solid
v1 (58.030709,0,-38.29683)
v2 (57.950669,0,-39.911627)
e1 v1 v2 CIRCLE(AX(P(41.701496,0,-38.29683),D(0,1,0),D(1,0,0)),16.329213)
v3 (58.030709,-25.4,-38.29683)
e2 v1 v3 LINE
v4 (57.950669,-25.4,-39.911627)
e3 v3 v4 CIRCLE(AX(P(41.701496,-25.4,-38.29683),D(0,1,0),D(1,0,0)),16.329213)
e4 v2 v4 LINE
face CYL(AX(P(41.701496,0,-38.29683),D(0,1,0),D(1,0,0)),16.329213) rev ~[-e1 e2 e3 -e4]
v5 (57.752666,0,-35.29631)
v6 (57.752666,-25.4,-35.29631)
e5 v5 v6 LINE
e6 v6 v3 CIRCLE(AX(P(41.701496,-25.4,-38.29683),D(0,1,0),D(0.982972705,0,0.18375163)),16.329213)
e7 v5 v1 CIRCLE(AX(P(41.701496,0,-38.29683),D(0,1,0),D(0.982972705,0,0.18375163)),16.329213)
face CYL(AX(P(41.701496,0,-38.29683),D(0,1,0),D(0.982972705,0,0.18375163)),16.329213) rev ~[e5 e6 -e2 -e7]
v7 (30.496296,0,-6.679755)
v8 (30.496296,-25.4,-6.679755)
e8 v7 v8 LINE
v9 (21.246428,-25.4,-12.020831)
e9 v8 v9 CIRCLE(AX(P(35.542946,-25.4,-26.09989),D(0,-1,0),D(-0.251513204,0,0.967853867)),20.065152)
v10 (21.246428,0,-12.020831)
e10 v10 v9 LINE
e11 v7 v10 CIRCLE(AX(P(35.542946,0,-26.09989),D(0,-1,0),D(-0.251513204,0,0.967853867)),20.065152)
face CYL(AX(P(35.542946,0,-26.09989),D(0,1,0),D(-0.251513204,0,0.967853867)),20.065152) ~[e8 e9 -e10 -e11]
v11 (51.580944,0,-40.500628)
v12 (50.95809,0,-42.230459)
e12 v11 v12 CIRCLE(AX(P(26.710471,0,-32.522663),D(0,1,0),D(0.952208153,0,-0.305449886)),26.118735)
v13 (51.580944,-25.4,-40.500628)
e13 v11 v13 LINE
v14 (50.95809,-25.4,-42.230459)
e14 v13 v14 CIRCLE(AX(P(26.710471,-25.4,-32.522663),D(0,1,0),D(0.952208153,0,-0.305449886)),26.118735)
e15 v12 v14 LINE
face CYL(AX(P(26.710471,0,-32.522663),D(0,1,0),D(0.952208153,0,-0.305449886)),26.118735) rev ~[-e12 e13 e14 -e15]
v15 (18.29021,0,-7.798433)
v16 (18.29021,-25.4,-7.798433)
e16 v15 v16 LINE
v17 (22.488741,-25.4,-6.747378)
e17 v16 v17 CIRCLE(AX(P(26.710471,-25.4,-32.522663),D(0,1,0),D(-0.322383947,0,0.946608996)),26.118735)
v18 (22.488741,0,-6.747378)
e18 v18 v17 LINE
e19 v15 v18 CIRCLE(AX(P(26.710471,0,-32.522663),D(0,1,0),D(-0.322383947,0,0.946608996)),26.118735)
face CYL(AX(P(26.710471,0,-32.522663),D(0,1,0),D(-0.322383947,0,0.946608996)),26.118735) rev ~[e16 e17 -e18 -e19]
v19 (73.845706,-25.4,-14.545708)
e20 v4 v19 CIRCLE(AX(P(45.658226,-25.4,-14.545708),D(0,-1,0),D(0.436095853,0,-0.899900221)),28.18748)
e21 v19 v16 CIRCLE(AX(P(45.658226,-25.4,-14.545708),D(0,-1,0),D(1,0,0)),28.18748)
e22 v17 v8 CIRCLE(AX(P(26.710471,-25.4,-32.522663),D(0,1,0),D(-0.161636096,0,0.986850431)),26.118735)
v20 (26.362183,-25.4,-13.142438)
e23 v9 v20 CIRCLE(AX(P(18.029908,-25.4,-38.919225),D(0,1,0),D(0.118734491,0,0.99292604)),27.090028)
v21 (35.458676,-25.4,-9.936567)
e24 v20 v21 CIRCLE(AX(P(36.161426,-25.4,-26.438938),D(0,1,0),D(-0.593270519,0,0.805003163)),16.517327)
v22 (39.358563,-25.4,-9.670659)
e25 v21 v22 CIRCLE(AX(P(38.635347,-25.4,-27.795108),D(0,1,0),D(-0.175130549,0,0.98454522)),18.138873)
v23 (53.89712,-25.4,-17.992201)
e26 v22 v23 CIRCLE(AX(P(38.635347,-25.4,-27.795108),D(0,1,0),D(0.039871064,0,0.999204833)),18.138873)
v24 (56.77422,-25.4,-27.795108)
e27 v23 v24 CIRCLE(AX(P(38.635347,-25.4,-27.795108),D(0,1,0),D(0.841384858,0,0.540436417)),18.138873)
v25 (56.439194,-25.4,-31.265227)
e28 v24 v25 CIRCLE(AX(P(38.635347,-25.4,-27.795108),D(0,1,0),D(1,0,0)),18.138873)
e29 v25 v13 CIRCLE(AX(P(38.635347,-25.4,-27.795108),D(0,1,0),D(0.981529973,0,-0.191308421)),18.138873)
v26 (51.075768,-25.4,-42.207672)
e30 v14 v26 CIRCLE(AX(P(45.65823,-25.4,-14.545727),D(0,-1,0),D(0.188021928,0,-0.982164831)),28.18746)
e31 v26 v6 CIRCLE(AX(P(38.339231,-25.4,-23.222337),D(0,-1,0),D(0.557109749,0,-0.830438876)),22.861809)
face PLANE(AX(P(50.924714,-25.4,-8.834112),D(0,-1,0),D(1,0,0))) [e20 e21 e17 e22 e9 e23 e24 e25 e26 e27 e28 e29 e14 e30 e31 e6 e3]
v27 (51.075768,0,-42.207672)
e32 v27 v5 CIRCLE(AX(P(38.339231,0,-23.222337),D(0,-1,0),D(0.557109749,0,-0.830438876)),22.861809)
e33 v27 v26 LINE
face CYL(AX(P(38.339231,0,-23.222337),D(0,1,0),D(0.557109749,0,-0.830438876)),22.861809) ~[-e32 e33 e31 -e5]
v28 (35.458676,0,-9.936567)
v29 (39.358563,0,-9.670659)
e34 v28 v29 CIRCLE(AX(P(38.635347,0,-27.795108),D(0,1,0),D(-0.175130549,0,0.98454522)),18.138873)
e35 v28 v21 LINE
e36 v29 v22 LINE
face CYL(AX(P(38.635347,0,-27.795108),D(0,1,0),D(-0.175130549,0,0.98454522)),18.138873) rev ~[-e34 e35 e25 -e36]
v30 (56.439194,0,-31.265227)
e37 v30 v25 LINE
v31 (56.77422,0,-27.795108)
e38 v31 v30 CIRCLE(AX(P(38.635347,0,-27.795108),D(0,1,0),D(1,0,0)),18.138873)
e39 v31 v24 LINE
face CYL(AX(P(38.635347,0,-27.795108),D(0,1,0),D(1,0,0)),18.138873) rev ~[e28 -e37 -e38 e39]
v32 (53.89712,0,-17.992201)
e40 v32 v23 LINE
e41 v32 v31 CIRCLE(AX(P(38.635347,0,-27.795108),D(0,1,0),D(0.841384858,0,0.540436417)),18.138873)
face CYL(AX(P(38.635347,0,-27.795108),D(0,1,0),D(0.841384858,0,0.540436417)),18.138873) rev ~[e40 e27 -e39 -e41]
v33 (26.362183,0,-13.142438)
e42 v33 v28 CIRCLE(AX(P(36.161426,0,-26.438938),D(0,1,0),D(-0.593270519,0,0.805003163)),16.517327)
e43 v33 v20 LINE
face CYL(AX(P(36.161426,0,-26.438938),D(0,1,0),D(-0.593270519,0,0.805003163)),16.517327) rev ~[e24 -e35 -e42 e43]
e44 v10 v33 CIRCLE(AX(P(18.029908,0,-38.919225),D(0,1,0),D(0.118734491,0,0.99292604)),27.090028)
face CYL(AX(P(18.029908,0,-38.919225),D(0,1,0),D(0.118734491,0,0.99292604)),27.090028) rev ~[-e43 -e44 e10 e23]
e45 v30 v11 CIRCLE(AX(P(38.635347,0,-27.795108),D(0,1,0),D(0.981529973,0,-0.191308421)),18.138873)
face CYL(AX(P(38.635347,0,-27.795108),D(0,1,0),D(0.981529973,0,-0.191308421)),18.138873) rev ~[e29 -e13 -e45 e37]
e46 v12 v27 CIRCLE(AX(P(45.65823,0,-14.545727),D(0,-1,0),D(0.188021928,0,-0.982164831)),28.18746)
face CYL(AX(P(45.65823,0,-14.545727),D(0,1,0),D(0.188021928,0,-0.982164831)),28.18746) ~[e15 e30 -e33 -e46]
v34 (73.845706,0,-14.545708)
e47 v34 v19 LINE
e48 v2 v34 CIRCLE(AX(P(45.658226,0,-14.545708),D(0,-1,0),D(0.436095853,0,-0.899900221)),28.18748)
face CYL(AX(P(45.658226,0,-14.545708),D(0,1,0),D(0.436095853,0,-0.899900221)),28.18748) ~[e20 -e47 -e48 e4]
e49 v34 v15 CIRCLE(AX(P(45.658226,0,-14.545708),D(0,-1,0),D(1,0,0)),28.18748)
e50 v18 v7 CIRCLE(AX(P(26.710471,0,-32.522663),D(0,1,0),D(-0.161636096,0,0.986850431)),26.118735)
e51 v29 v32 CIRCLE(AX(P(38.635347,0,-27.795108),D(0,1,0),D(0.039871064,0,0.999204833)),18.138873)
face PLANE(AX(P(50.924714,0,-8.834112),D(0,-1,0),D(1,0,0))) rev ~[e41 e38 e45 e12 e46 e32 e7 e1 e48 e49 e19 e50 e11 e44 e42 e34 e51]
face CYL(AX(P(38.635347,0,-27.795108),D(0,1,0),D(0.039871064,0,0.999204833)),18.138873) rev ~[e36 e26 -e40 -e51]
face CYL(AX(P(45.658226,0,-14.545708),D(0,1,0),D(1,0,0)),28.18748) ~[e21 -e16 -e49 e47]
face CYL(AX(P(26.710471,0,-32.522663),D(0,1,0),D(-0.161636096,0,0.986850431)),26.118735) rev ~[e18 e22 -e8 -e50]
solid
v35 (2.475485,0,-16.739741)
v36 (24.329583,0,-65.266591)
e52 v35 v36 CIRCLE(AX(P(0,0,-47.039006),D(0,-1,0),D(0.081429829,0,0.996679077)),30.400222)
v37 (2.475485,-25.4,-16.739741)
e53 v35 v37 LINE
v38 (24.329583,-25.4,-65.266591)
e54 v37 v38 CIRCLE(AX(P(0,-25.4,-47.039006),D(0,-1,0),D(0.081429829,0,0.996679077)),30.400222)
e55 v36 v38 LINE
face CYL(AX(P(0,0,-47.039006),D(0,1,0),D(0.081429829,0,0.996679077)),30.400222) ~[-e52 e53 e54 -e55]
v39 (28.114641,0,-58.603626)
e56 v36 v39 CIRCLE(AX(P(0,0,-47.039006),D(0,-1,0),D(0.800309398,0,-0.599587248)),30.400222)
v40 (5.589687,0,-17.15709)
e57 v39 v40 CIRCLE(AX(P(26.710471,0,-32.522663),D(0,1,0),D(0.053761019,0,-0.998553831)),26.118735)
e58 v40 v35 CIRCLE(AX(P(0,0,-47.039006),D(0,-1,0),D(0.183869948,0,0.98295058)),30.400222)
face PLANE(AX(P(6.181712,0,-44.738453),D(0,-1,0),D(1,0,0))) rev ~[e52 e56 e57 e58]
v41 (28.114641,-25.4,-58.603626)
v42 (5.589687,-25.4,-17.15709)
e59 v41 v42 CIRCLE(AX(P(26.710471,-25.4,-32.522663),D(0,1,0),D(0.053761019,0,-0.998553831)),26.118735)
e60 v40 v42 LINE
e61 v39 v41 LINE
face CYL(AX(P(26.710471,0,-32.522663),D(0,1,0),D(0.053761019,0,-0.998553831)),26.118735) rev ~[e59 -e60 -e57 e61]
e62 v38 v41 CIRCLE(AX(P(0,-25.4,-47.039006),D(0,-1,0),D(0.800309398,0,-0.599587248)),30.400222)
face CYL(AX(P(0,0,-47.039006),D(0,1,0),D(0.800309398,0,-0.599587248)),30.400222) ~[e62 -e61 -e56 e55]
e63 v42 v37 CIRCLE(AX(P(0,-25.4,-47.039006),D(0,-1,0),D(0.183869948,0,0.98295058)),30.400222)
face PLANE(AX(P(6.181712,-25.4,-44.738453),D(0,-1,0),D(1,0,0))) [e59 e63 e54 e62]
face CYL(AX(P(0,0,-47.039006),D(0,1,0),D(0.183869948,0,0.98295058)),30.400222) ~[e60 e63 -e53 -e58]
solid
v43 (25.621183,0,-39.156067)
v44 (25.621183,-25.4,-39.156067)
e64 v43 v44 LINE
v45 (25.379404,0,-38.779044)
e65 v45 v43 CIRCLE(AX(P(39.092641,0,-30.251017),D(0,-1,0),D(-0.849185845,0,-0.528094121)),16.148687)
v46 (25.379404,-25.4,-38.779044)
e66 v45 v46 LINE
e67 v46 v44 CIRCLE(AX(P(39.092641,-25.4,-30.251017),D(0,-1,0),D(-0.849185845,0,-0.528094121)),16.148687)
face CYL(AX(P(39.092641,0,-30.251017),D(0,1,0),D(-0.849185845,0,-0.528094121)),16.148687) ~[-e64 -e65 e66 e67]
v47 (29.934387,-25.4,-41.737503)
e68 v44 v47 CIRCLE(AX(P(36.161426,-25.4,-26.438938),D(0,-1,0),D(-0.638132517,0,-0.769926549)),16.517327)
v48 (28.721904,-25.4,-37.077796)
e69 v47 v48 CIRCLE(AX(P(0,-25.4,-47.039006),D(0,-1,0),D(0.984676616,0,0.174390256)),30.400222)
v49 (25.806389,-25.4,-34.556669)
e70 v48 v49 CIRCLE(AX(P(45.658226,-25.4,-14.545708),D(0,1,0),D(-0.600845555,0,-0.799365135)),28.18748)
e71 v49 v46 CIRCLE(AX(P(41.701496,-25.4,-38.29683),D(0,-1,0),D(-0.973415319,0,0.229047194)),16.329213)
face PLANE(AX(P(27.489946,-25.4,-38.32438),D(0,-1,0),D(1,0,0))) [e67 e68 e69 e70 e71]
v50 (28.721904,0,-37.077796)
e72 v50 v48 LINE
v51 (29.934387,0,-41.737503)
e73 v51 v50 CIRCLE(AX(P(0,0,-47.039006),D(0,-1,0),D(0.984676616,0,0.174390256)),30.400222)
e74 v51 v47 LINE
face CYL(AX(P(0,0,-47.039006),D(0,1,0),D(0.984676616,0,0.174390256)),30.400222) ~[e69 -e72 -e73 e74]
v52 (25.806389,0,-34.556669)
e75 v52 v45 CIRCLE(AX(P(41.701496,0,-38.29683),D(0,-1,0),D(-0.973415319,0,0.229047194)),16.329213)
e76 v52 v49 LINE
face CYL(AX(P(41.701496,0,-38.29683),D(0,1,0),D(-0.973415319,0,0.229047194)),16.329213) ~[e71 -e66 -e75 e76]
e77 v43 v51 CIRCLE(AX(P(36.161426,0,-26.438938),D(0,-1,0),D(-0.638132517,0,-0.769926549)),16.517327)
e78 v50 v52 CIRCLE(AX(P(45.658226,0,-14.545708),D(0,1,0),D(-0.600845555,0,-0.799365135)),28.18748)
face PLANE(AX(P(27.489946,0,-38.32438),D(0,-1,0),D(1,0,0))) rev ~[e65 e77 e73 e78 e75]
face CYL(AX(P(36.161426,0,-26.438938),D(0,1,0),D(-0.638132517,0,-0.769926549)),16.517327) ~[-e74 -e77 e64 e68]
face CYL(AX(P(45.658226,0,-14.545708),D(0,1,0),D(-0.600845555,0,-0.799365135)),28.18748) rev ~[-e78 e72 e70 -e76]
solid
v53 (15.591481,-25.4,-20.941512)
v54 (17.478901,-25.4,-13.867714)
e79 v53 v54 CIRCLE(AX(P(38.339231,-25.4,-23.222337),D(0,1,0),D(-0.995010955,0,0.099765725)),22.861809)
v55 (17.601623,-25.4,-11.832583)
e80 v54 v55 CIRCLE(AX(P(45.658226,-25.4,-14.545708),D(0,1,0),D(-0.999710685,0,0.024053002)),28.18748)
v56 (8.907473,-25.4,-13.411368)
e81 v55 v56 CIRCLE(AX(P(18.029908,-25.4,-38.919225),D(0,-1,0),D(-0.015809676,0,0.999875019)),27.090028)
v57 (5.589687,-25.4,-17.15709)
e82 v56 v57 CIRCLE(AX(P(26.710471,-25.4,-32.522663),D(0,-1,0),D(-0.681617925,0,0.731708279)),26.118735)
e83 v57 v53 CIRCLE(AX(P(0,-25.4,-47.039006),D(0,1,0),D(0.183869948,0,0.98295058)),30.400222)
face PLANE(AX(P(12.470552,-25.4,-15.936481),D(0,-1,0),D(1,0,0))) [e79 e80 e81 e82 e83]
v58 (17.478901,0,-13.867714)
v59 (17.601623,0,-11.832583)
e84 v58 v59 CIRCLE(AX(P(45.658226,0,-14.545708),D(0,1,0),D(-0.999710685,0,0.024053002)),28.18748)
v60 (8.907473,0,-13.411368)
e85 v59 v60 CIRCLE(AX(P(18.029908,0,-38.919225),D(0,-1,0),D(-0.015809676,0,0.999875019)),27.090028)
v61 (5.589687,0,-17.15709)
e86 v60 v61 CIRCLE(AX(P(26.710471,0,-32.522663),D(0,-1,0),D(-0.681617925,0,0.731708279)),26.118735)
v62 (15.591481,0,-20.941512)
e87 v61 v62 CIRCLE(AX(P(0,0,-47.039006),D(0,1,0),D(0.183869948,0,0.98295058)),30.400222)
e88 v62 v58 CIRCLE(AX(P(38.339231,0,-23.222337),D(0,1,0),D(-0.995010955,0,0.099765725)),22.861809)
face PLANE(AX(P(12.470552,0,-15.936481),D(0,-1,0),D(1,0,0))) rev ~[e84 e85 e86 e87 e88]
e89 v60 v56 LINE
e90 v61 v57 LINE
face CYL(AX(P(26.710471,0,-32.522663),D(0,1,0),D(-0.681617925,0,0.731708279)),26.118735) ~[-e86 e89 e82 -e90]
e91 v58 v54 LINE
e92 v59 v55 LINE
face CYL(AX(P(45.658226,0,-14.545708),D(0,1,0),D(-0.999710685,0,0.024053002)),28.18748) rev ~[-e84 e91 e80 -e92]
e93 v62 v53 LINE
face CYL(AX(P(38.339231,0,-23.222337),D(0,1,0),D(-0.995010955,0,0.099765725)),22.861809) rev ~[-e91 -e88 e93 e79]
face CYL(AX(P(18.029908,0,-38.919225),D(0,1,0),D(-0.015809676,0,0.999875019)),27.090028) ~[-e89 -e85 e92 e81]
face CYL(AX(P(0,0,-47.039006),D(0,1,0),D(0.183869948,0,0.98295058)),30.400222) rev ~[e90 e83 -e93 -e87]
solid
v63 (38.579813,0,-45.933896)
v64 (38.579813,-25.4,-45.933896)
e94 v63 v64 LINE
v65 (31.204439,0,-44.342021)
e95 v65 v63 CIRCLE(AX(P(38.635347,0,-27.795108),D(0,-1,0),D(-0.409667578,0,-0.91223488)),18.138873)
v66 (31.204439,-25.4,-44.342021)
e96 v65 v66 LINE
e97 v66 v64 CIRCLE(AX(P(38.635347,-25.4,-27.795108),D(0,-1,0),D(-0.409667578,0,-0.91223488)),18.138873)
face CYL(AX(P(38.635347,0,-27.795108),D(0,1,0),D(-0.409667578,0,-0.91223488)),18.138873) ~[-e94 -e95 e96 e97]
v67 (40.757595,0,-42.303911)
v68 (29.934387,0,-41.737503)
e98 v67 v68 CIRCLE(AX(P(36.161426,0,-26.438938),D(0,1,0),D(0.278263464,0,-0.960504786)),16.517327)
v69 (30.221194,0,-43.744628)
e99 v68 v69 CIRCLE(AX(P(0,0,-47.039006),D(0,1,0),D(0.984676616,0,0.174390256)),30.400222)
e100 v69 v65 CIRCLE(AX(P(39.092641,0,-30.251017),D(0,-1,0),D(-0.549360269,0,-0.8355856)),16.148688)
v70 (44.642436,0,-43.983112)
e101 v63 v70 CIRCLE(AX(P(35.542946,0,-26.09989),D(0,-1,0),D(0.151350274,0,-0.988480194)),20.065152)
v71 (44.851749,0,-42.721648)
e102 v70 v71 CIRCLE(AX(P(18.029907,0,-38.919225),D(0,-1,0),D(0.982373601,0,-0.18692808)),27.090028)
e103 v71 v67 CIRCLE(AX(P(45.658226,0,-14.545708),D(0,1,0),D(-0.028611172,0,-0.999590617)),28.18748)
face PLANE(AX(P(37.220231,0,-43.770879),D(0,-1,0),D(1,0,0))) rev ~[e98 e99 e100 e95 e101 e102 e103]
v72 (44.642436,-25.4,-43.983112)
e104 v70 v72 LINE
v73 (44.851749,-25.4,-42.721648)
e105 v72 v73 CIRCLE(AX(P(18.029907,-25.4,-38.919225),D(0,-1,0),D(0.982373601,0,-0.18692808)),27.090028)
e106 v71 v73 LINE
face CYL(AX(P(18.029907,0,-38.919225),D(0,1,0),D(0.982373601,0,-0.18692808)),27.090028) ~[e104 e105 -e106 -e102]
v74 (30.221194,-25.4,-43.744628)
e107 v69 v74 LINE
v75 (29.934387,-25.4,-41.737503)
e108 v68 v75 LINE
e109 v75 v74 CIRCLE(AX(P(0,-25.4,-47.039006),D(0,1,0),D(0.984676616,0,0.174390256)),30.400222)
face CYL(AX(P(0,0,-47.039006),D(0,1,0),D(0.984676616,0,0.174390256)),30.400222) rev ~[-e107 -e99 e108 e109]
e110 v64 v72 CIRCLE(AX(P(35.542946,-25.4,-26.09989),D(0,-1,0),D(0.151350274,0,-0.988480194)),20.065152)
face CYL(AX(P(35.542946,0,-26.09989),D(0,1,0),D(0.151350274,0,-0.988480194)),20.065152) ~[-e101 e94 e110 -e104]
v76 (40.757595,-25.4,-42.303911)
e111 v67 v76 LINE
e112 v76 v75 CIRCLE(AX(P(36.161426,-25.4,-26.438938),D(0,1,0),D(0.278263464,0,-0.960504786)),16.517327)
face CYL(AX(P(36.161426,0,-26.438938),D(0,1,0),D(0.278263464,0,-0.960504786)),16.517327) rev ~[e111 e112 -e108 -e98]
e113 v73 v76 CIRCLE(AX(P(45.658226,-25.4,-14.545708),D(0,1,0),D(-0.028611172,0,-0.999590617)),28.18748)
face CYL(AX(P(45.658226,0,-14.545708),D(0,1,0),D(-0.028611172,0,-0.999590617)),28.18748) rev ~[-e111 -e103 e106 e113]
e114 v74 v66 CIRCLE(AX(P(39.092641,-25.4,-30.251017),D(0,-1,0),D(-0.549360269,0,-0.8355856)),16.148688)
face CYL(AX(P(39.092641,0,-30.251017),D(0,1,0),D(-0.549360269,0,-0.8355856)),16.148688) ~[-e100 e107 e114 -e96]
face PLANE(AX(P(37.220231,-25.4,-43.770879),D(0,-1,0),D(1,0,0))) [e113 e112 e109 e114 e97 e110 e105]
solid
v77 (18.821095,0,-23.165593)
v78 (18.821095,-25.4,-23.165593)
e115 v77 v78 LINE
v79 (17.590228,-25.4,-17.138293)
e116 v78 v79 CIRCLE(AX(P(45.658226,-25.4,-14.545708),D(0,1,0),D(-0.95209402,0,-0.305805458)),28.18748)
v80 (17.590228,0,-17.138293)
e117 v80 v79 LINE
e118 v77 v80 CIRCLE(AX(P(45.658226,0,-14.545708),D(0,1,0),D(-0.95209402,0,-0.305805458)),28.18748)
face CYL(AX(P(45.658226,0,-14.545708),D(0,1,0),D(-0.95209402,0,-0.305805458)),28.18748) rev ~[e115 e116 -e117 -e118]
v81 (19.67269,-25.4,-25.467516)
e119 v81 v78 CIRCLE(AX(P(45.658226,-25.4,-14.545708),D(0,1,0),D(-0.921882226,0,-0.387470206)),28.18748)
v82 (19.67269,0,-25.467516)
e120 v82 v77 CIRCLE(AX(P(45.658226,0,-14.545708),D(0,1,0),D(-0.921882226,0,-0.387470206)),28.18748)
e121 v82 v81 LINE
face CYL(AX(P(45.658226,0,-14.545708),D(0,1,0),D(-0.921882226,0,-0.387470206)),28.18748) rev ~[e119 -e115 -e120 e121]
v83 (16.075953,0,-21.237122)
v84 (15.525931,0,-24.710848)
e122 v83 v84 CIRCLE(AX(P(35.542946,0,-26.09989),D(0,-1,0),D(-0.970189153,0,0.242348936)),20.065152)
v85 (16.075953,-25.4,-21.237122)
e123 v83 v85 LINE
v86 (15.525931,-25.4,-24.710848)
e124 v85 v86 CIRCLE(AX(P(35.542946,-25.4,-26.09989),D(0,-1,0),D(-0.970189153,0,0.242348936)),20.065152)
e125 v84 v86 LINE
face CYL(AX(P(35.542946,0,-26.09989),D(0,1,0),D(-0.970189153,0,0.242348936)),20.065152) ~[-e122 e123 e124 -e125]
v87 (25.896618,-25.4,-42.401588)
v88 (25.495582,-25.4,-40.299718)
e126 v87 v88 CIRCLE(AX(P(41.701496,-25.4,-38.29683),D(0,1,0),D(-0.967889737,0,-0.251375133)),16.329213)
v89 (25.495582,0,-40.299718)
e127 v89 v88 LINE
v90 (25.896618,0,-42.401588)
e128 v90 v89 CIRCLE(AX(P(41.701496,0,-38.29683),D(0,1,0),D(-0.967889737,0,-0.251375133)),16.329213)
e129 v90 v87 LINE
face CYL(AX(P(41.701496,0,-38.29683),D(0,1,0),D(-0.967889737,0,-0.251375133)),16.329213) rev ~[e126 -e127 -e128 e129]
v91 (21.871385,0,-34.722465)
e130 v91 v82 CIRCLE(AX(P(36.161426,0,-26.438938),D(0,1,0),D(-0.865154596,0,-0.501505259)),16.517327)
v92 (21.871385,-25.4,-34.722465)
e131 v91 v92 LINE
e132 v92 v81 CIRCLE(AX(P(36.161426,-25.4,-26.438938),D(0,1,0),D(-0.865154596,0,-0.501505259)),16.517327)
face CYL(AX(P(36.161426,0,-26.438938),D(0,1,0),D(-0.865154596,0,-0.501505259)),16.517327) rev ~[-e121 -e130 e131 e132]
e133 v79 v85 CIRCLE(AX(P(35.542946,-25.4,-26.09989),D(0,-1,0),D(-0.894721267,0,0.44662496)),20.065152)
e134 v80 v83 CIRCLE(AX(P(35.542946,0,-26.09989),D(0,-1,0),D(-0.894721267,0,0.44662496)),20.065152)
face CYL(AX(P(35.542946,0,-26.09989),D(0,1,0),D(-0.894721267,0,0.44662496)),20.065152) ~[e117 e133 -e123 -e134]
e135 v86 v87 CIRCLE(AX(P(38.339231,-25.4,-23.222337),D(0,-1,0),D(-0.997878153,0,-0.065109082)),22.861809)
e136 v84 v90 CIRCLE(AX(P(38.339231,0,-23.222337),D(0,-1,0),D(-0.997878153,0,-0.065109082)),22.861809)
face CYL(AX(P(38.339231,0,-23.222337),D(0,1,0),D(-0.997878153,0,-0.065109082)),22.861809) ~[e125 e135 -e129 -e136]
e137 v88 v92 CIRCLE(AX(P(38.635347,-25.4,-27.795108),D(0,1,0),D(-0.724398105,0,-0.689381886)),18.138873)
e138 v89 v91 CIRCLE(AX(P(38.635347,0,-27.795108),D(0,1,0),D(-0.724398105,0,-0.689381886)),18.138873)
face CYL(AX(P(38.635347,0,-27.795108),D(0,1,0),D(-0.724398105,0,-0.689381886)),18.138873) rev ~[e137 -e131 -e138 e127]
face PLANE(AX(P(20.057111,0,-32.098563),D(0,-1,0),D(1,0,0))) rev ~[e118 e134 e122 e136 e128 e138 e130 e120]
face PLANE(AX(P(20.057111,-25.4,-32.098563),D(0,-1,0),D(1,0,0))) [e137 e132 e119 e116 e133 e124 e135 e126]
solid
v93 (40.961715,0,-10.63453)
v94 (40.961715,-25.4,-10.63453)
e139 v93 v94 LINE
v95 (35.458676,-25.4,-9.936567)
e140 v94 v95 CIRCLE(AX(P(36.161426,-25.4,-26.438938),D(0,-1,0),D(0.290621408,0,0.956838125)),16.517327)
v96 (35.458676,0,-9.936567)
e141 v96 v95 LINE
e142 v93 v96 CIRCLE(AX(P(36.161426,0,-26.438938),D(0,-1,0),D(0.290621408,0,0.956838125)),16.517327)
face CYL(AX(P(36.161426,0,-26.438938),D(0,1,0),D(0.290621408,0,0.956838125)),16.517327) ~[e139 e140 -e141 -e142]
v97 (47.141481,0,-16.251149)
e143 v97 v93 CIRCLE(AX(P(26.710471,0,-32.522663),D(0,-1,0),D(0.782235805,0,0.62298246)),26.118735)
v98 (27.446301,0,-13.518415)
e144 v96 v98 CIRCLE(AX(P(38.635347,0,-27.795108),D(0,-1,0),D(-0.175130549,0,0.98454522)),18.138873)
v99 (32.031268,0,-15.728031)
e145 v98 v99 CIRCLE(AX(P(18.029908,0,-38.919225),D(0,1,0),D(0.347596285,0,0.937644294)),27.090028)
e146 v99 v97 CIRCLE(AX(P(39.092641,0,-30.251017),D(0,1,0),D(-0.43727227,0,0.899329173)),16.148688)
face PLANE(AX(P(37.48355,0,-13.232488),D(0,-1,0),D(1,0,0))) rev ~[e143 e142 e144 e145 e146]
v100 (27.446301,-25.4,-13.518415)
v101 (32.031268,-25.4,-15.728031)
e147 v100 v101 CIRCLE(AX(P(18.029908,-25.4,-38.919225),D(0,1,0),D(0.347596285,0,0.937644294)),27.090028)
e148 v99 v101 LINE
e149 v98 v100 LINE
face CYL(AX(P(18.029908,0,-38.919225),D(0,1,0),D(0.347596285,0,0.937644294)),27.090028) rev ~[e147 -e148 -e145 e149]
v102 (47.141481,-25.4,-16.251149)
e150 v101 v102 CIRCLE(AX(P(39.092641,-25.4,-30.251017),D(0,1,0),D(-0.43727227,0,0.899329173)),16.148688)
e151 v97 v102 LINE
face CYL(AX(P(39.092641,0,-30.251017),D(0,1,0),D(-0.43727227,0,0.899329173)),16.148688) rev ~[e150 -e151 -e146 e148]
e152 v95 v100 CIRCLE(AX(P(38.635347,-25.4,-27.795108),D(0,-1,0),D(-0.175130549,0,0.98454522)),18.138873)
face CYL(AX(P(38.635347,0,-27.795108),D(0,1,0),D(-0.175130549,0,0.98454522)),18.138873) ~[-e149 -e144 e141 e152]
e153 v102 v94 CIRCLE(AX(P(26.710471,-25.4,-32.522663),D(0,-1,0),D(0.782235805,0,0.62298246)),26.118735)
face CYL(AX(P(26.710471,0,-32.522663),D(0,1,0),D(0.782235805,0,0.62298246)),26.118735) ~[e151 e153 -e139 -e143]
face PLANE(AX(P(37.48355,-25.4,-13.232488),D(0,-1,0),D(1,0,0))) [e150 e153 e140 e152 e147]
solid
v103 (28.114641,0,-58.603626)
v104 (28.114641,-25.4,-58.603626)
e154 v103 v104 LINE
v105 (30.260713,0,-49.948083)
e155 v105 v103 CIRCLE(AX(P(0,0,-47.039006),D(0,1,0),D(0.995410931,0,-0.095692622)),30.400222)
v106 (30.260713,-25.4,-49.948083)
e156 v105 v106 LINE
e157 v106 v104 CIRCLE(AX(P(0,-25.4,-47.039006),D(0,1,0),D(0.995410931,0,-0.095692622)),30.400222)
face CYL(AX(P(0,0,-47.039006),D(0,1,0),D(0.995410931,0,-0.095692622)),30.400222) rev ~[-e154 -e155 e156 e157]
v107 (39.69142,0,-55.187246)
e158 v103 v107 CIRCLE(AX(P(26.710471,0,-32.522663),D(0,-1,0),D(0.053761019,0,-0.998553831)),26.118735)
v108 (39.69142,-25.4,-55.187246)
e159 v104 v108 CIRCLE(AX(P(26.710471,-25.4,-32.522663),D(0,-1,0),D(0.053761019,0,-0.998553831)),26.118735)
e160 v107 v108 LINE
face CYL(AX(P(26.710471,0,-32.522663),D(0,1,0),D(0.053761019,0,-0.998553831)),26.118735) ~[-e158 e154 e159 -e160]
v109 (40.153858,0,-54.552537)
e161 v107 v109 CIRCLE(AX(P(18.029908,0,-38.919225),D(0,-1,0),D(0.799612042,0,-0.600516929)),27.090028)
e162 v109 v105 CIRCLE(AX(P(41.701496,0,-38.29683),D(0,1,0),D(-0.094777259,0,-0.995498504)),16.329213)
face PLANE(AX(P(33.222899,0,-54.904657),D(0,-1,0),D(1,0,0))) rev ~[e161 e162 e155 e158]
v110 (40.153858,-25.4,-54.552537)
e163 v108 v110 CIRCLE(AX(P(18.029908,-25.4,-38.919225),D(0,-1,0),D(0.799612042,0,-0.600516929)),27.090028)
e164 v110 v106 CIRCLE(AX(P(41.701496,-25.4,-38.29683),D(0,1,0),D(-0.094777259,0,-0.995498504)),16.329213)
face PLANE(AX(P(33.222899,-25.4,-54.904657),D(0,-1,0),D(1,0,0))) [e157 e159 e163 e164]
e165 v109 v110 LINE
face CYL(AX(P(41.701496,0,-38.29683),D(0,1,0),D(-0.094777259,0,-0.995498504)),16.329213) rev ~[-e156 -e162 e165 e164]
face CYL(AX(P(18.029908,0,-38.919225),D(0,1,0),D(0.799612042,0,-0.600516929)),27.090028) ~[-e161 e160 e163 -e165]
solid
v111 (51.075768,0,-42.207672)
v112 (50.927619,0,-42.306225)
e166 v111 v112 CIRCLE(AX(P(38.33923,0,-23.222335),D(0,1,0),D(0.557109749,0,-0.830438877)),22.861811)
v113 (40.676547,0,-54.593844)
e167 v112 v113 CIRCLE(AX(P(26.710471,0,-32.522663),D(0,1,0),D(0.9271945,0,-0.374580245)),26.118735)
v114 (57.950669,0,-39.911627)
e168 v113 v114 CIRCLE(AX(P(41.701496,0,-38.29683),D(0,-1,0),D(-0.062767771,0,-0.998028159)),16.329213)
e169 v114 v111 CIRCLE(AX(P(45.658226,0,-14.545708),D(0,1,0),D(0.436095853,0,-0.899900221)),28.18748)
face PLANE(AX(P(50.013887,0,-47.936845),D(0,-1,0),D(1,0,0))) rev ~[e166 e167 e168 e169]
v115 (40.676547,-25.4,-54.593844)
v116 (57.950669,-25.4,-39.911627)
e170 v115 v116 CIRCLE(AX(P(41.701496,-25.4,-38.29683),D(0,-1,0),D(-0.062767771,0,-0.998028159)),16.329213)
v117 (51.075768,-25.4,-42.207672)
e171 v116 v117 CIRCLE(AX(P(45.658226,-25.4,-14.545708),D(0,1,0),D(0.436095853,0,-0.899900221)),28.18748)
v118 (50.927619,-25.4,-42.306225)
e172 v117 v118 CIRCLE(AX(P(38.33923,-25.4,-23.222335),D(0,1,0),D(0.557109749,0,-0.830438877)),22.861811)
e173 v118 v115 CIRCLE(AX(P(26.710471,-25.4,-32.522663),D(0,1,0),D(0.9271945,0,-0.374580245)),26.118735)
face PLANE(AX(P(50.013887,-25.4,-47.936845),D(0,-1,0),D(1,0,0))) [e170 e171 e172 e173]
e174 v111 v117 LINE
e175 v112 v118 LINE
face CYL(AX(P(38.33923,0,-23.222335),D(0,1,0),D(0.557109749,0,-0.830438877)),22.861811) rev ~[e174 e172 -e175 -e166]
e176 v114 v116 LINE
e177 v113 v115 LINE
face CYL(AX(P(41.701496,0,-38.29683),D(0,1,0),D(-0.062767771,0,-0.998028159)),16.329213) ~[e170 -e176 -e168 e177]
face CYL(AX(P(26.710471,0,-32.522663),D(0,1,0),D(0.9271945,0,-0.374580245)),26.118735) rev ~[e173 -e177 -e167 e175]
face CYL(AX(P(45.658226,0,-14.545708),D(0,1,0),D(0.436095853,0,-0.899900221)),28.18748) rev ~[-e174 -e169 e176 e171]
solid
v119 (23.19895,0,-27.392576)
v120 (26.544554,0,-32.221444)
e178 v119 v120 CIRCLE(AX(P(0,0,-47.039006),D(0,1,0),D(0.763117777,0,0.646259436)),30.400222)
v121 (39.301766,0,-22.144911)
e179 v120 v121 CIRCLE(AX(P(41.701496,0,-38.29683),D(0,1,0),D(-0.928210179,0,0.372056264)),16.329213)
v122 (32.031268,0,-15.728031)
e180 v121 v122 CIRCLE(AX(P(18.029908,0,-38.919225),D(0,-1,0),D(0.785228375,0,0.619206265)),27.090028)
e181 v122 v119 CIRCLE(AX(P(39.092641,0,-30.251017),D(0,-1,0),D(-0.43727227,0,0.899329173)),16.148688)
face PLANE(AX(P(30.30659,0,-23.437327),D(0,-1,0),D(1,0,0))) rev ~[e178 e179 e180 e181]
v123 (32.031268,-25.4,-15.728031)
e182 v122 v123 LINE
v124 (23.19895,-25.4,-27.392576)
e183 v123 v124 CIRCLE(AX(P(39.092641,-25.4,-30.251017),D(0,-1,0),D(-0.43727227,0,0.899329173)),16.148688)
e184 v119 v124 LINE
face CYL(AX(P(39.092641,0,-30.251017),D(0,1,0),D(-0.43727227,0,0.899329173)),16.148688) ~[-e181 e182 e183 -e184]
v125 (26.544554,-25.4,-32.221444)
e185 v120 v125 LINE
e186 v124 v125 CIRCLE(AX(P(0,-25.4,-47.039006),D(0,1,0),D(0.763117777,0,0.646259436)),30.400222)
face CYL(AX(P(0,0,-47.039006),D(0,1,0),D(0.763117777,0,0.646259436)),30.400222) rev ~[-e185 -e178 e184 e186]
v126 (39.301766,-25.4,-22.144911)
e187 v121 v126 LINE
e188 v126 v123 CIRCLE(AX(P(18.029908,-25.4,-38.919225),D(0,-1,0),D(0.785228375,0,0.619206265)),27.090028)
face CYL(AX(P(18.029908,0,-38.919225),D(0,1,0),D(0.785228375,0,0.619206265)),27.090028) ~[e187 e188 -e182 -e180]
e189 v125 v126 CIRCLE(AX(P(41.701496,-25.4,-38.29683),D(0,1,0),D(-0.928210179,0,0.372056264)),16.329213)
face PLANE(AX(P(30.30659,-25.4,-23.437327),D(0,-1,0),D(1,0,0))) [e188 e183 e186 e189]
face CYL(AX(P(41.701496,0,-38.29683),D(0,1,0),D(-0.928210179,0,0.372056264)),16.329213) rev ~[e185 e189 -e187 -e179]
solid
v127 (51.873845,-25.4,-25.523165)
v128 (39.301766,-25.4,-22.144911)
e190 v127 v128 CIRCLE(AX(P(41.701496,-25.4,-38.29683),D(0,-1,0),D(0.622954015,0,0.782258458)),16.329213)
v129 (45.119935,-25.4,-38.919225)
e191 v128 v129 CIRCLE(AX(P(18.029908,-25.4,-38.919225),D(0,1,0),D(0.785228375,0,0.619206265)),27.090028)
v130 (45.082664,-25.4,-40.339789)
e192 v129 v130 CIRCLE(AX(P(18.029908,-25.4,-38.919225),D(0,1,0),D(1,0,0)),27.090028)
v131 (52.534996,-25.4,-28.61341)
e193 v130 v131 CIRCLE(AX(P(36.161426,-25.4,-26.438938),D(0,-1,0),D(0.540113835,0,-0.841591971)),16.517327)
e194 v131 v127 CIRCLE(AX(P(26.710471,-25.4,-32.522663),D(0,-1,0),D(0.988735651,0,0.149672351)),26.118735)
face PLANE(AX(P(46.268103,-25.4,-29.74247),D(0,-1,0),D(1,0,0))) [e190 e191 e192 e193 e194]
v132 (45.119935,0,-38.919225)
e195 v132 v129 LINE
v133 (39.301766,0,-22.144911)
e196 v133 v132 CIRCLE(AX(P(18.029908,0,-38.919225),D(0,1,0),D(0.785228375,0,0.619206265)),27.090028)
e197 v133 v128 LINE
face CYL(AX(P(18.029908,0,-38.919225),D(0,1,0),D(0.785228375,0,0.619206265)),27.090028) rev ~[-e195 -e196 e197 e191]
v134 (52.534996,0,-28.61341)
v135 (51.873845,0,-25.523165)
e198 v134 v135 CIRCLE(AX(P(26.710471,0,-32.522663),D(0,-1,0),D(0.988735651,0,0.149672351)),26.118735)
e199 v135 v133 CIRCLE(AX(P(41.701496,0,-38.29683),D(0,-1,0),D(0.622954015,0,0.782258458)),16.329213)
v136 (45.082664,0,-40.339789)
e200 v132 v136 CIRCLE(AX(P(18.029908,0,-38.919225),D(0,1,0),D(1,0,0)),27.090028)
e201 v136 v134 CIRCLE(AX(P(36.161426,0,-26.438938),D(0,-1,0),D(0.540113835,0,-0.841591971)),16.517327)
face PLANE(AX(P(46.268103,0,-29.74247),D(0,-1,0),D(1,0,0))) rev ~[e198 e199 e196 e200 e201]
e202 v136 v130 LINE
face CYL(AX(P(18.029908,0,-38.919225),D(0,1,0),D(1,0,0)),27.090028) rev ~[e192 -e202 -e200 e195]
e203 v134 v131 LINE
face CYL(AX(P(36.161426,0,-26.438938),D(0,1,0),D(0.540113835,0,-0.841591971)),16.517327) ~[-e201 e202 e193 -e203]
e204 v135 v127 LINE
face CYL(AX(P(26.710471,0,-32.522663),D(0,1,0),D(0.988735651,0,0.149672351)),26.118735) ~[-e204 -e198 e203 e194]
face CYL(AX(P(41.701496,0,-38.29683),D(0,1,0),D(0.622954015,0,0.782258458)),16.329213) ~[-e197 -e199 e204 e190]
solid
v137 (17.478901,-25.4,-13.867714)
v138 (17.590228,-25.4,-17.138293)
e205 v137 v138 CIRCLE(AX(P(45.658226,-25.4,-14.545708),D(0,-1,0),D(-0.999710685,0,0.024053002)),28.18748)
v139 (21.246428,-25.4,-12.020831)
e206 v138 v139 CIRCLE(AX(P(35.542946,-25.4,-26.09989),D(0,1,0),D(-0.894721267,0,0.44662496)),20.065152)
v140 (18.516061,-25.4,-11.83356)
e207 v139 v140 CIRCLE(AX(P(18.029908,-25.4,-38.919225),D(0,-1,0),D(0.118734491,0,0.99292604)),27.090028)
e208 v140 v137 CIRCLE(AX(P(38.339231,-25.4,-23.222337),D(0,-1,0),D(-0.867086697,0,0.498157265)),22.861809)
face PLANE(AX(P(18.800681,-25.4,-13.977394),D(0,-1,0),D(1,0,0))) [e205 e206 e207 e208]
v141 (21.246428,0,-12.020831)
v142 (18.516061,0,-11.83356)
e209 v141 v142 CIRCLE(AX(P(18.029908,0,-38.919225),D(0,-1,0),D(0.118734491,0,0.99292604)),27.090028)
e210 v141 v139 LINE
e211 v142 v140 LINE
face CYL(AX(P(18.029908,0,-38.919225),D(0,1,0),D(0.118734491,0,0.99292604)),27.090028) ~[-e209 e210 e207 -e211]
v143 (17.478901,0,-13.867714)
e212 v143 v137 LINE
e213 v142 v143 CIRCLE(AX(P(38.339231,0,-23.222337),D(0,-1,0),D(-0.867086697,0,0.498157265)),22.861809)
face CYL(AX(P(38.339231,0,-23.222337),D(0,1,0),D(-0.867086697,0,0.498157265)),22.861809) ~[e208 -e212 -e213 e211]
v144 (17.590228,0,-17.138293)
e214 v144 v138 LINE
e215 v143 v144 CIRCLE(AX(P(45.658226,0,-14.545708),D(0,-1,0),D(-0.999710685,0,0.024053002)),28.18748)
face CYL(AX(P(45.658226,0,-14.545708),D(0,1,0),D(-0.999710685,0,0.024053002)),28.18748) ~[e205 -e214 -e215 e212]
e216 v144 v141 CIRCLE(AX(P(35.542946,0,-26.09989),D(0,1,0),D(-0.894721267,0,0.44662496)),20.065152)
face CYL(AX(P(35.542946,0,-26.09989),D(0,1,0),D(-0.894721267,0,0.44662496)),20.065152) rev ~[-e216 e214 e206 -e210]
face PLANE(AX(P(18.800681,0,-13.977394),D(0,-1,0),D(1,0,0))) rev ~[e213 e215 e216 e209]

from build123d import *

# Parameters (mm, degrees)
F1_DEPTH = 25.4


with BuildPart() as f1:
    # F0 (on Front) → F1 (new body)
    with BuildSketch(Plane.XZ):
        with BuildLine():
            ThreePointArc((40.1538575824, -54.5525371766), (34.8112838881, -53.101159825), (30.2607130008, -49.9480828366))
            ThreePointArc((30.2607130008, -49.9480828366), (29.5067805021, -54.3549736685), (28.1146409687, -58.6036262239))
            ThreePointArc((28.1146409687, -58.6036262239), (34.1030907269, -57.5733618162), (39.691420026, -55.1872455363))
            ThreePointArc((39.691420026, -55.1872455363), (39.9249388458, -54.8715671271), (40.1538575824, -54.5525371766))
        make_face()
    extrude(amount=F1_DEPTH)


with BuildPart() as f1b:
    # F0 (on Front) → F1, piece 2 (new body)
    with BuildSketch(Plane.XZ):
        with BuildLine():
            ThreePointArc((24.3295831314, -65.2665911695), (26.4328949575, -62.0548490079), (28.1146409687, -58.6036262239))
            ThreePointArc((28.1146409687, -58.6036262239), (3.7618317001, -44.9945627843), (5.5896871945, -17.1570903547))
            ThreePointArc((5.5896871945, -17.1570903547), (4.0379815695, -16.9081548594), (2.4754848513, -16.7397409859))
            ThreePointArc((2.4754848513, -16.7397409859), (-6.670828805, -50.0432179604), (24.3295831314, -65.2665911695))
        make_face()
        with BuildLine():
            ThreePointArc((2.4754848513, -16.7397409859), (-27.7189775168, -59.5222653089), (24.3295831314, -65.2665911695))
            ThreePointArc((24.3295831314, -65.2665911695), (-6.670828805, -50.0432179604), (2.4754848513, -16.7397409859))
        make_face()
    extrude(amount=F1_DEPTH)


with BuildPart() as f1c:
    # F0 (on Front) → F1, piece 3 (new body)
    with BuildSketch(Plane.XZ):
        with BuildLine():
            ThreePointArc((15.5259313509, -24.7108479388), (18.6165177504, -34.7842088044), (25.8966178224, -42.4015880363))
            ThreePointArc((25.8966178224, -42.4015880363), (25.6616341127, -41.3572292778), (25.4955819125, -40.2997184139))
            ThreePointArc((25.4955819125, -40.2997184139), (23.4256571039, -37.6786317178), (21.8713846988, -34.7224650322))
            ThreePointArc((21.8713846988, -34.7224650322), (20.0913666116, -30.2566972991), (19.6726895469, -25.4675162258))
            ThreePointArc((19.6726895469, -25.4675162258), (19.221825797, -24.3258278708), (18.8210952423, -23.1655927897))
            ThreePointArc((18.8210952423, -23.1655927897), (17.4751466685, -22.1634611108), (16.075953424, -21.2371222257))
            ThreePointArc((16.075953424, -21.2371222257), (15.7246867633, -22.9619109348), (15.5259313509, -24.7108479388))
        make_face()
        with BuildLine():
            ThreePointArc((17.5902280452, -17.1382927375), (16.7211824063, -19.1463639854), (16.075953424, -21.2371222257))
            ThreePointArc((16.075953424, -21.2371222257), (17.4751466685, -22.1634611108), (18.8210952423, -23.1655927897))
            ThreePointArc((18.8210952423, -23.1655927897), (18.0407428379, -20.1856217155), (17.5902280452, -17.1382927375))
        make_face()
    extrude(amount=F1_DEPTH)


with BuildPart() as f1d:
    # F0 (on Front) → F1, piece 4 (new body)
    with BuildSketch(Plane.XZ):
        with BuildLine():
            ThreePointArc((8.9074729487, -13.4113681026), (7.1586729424, -15.2045936945), (5.5896871945, -17.1570903547))
            ThreePointArc((5.5896871945, -17.1570903547), (10.7582958294, -18.606057575), (15.5914806817, -20.94151158))
            ThreePointArc((15.5914806817, -20.94151158), (16.2501882549, -17.3285688299), (17.4789014653, -13.8677141914))
            ThreePointArc((17.4789014653, -13.8677141914), (17.5218559184, -12.8490388813), (17.6016231545, -11.8325834418))
            ThreePointArc((17.6016231545, -11.8325834418), (13.1897424114, -12.265100016), (8.9074729487, -13.4113681026))
        make_face()
    extrude(amount=F1_DEPTH)


with BuildPart() as f1e:
    # F0 (on Front) → F1, piece 5 (new body)
    with BuildSketch(Plane.XZ):
        with BuildLine():
            ThreePointArc((50.9276188863, -42.3062252748), (46.7662943353, -49.2544379076), (40.6765473403, -54.5938444613))
            ThreePointArc((40.6765473403, -54.5938444613), (52.276756188, -50.7389787125), (57.9506689588, -39.9116268146))
            ThreePointArc((57.9506689588, -39.9116268146), (54.5873270883, -41.2815480667), (51.0757678908, -42.2076715883))
            ThreePointArc((51.0757678908, -42.2076715883), (51.0017892703, -42.257092564), (50.9276188863, -42.3062252748))
        make_face()
    extrude(amount=F1_DEPTH)


with BuildPart() as f1f:
    # F0 (on Front) → F1, piece 6 (new body)
    with BuildSketch(Plane.XZ):
        with BuildLine():
            ThreePointArc((29.9343874447, -41.7375034561), (30.0945281638, -42.7386739982), (30.2211937836, -43.744627936))
            ThreePointArc((30.2211937836, -43.744627936), (30.7074945796, -44.0520833186), (31.204438934, -44.3420205277))
            ThreePointArc((31.204438934, -44.3420205277), (34.8084393601, -45.5256885647), (38.5798125698, -45.9338958727))
            ThreePointArc((38.5798125698, -45.9338958727), (41.6890159042, -45.2005751575), (44.6424357179, -43.9831122014))
            ThreePointArc((44.6424357179, -43.9831122014), (44.7545364965, -43.3536151903), (44.8517491914, -42.721647815))
            ThreePointArc((44.8517491914, -42.721647815), (42.7970382383, -42.5875979854), (40.7575952062, -42.3039105235))
            ThreePointArc((40.7575952062, -42.3039105235), (35.2982122915, -42.9336942044), (29.9343874447, -41.7375034561))
        make_face()
    extrude(amount=F1_DEPTH)


with BuildPart() as f1g:
    # F0 (on Front) → F1, piece 7 (new body)
    with BuildSketch(Plane.XZ):
        with BuildLine():
            ThreePointArc((58.0307088051, -38.2968299091), (58.0106865683, -39.1052195774), (57.9506689588, -39.9116268146))
            ThreePointArc((57.9506689588, -39.9116268146), (69.5436503466, -29.5130224408), (73.8457056162, -14.5457076903))
            ThreePointArc((73.8457056162, -14.5457076903), (49.056653384, 13.4361560453), (18.2902101299, -7.7984331473))
            ThreePointArc((18.2902101299, -7.7984331473), (20.3676668553, -7.1857892567), (22.4887407194, -6.747377754))
            ThreePointArc((22.4887407194, -6.747377754), (47.2916450309, -2.1862580033), (61.2010402451, -23.2223365456))
            ThreePointArc((61.2010402451, -23.2223365456), (60.3220490691, -29.5007146335), (57.7526664727, -35.2963103729))
            ThreePointArc((57.7526664727, -35.2963103729), (57.9610496417, -36.7901427298), (58.0307088051, -38.2968299091))
        make_face()
        with BuildLine():
            ThreePointArc((51.5809438877, -40.5006277219), (51.2847425976, -41.3710254533), (50.9580903246, -42.2304588174))
            ThreePointArc((50.9580903246, -42.2304588174), (51.0169412202, -42.219127754), (51.0757678908, -42.2076715883))
            ThreePointArc((51.0757678908, -42.2076715883), (54.7814604512, -39.1067758035), (57.7526664727, -35.2963103729))
            ThreePointArc((57.7526664727, -35.2963103729), (57.2273138462, -33.2379593231), (56.4391944195, -31.2652271578))
            ThreePointArc((56.4391944195, -31.2652271578), (54.6885472182, -36.2398384797), (51.5809438877, -40.5006277219))
        make_face()
        with BuildLine():
            ThreePointArc((30.4962956225, -6.6797554599), (25.5094366348, -8.7234981349), (21.2464283719, -12.020831487))
            ThreePointArc((21.2464283719, -12.020831487), (23.8314740731, -12.4577169776), (26.3621830346, -13.1424376226))
            ThreePointArc((26.3621830346, -13.1424376226), (30.6712198814, -10.8607569892), (35.458676282, -9.9365674679))
            ThreePointArc((35.458676282, -9.9365674679), (37.4014358799, -9.6982527409), (39.3585631952, -9.6706586179))
            ThreePointArc((39.3585631952, -9.6706586179), (35.0624037675, -7.7752680174), (30.4962956225, -6.6797554599))
        make_face()
        with BuildLine():
            ThreePointArc((61.2010402451, -23.2223365456), (47.2916450309, -2.1862580033), (22.4887407194, -6.747377754))
            ThreePointArc((22.4887407194, -6.747377754), (26.4899111925, -6.4048589093), (30.4962956225, -6.6797554599))
            ThreePointArc((30.4962956225, -6.6797554599), (44.2759524191, -8.0348709228), (53.8971199923, -17.9922005789))
            ThreePointArc((53.8971199923, -17.9922005789), (56.0400887398, -22.6869112297), (56.7742198891, -27.7951080352))
            ThreePointArc((56.7742198891, -27.7951080352), (56.6902692508, -29.538235167), (56.4391944195, -31.2652271578))
            ThreePointArc((56.4391944195, -31.2652271578), (57.2273138462, -33.2379593231), (57.7526664727, -35.2963103729))
            ThreePointArc((57.7526664727, -35.2963103729), (60.3220490691, -29.5007146335), (61.2010402451, -23.2223365456))
        make_face()
        with BuildLine():
            ThreePointArc((53.8971199923, -17.9922005789), (44.2759524191, -8.0348709228), (30.4962956225, -6.6797554599))
            ThreePointArc((30.4962956225, -6.6797554599), (35.0624037675, -7.7752680174), (39.3585631952, -9.6706586179))
            ThreePointArc((39.3585631952, -9.6706586179), (47.6460065242, -12.0525947694), (53.8971199923, -17.9922005789))
        make_face()
    extrude(amount=F1_DEPTH)


with BuildPart() as f1h:
    # F0 (on Front) → F1, piece 8 (new body)
    with BuildSketch(Plane.XZ):
        with BuildLine():
            ThreePointArc((25.6211827252, -39.1560673783), (27.6790096014, -40.6118249025), (29.9343874447, -41.7375034561))
            ThreePointArc((29.9343874447, -41.7375034561), (29.4205430771, -39.3836074861), (28.7219041832, -37.0777961393))
            ThreePointArc((28.7219041832, -37.0777961393), (27.2210036067, -35.8671250202), (25.8063894155, -34.5566694548))
            ThreePointArc((25.8063894155, -34.5566694548), (25.4551400683, -36.6539261554), (25.3794041172, -38.7790439964))
            ThreePointArc((25.3794041172, -38.7790439964), (25.4989862537, -38.9683939513), (25.6211827252, -39.1560673783))
        make_face()
    extrude(amount=F1_DEPTH)


with BuildPart() as f1i:
    # F0 (on Front) → F1, piece 9 (new body)
    with BuildSketch(Plane.XZ):
        with BuildLine():
            ThreePointArc((18.5160606443, -11.8335602694), (17.9720702659, -12.8376809675), (17.4789014653, -13.8677141914))
            ThreePointArc((17.4789014653, -13.8677141914), (17.4870617924, -15.5046204085), (17.5902280452, -17.1382927375))
            ThreePointArc((17.5902280452, -17.1382927375), (19.2165746577, -14.4354180997), (21.2464283719, -12.020831487))
            ThreePointArc((21.2464283719, -12.020831487), (19.8836109137, -11.8926942742), (18.5160606443, -11.8335602694))
        make_face()
    extrude(amount=F1_DEPTH)


with BuildPart() as f1j:
    # F0 (on Front) → F1, piece 10 (new body)
    with BuildSketch(Plane.XZ):
        with BuildLine():
            ThreePointArc((23.1989496039, -27.3925757669), (24.988667911, -29.7260062824), (26.5445537779, -32.221443871))
            ThreePointArc((26.5445537779, -32.221443871), (31.5800674362, -25.4827792883), (39.3017660933, -22.1449105057))
            ThreePointArc((39.3017660933, -22.1449105057), (35.9559801688, -18.608500995), (32.0312678982, -15.7280306735))
            ThreePointArc((32.0312678982, -15.7280306735), (26.218280873, -20.5026341621), (23.1989496039, -27.3925757669))
        make_face()
    extrude(amount=F1_DEPTH)


with BuildPart() as f1k:
    # F0 (on Front) → F1, piece 11 (new body)
    with BuildSketch(Plane.XZ):
        with BuildLine():
            ThreePointArc((45.1199353433, -38.9192253351), (45.1106157855, -39.6297514098), (45.0826635243, -40.3397886117))
            ThreePointArc((45.0826635243, -40.3397886117), (50.1017921487, -35.2983013137), (52.5349959324, -28.6134104641))
            ThreePointArc((52.5349959324, -28.6134104641), (52.2512002854, -27.0582791448), (51.8738445479, -25.5231648048))
            ThreePointArc((51.8738445479, -25.5231648048), (45.9390130106, -22.5270281049), (39.3017660933, -22.1449105057))
            ThreePointArc((39.3017660933, -22.1449105057), (43.6240948292, -30.0418843563), (45.1199353433, -38.9192253351))
        make_face()
    extrude(amount=F1_DEPTH)


with BuildPart() as f1l:
    # F0 (on Front) → F1, piece 12 (new body)
    with BuildSketch(Plane.XZ):
        with BuildLine():
            ThreePointArc((35.458676282, -9.9365674679), (31.2325863434, -11.2355838156), (27.4463006765, -13.5184154981))
            ThreePointArc((27.4463006765, -13.5184154981), (29.7907916271, -14.5153074856), (32.0312678982, -15.7280306735))
            ThreePointArc((32.0312678982, -15.7280306735), (39.651377077, -14.1119977804), (47.1414811046, -16.2511489823))
            ThreePointArc((47.1414811046, -16.2511489823), (44.2775224684, -13.1942630568), (40.9617154104, -10.6345298313))
            ThreePointArc((40.9617154104, -10.6345298313), (38.2397055228, -10.0528815127), (35.458676282, -9.9365674679))
        make_face()
    extrude(amount=F1_DEPTH)


solid = Compound([f1.part, f1b.part, f1c.part, f1d.part, f1e.part, f1f.part, f1g.part, f1h.part, f1i.part, f1j.part, f1k.part, f1l.part])
